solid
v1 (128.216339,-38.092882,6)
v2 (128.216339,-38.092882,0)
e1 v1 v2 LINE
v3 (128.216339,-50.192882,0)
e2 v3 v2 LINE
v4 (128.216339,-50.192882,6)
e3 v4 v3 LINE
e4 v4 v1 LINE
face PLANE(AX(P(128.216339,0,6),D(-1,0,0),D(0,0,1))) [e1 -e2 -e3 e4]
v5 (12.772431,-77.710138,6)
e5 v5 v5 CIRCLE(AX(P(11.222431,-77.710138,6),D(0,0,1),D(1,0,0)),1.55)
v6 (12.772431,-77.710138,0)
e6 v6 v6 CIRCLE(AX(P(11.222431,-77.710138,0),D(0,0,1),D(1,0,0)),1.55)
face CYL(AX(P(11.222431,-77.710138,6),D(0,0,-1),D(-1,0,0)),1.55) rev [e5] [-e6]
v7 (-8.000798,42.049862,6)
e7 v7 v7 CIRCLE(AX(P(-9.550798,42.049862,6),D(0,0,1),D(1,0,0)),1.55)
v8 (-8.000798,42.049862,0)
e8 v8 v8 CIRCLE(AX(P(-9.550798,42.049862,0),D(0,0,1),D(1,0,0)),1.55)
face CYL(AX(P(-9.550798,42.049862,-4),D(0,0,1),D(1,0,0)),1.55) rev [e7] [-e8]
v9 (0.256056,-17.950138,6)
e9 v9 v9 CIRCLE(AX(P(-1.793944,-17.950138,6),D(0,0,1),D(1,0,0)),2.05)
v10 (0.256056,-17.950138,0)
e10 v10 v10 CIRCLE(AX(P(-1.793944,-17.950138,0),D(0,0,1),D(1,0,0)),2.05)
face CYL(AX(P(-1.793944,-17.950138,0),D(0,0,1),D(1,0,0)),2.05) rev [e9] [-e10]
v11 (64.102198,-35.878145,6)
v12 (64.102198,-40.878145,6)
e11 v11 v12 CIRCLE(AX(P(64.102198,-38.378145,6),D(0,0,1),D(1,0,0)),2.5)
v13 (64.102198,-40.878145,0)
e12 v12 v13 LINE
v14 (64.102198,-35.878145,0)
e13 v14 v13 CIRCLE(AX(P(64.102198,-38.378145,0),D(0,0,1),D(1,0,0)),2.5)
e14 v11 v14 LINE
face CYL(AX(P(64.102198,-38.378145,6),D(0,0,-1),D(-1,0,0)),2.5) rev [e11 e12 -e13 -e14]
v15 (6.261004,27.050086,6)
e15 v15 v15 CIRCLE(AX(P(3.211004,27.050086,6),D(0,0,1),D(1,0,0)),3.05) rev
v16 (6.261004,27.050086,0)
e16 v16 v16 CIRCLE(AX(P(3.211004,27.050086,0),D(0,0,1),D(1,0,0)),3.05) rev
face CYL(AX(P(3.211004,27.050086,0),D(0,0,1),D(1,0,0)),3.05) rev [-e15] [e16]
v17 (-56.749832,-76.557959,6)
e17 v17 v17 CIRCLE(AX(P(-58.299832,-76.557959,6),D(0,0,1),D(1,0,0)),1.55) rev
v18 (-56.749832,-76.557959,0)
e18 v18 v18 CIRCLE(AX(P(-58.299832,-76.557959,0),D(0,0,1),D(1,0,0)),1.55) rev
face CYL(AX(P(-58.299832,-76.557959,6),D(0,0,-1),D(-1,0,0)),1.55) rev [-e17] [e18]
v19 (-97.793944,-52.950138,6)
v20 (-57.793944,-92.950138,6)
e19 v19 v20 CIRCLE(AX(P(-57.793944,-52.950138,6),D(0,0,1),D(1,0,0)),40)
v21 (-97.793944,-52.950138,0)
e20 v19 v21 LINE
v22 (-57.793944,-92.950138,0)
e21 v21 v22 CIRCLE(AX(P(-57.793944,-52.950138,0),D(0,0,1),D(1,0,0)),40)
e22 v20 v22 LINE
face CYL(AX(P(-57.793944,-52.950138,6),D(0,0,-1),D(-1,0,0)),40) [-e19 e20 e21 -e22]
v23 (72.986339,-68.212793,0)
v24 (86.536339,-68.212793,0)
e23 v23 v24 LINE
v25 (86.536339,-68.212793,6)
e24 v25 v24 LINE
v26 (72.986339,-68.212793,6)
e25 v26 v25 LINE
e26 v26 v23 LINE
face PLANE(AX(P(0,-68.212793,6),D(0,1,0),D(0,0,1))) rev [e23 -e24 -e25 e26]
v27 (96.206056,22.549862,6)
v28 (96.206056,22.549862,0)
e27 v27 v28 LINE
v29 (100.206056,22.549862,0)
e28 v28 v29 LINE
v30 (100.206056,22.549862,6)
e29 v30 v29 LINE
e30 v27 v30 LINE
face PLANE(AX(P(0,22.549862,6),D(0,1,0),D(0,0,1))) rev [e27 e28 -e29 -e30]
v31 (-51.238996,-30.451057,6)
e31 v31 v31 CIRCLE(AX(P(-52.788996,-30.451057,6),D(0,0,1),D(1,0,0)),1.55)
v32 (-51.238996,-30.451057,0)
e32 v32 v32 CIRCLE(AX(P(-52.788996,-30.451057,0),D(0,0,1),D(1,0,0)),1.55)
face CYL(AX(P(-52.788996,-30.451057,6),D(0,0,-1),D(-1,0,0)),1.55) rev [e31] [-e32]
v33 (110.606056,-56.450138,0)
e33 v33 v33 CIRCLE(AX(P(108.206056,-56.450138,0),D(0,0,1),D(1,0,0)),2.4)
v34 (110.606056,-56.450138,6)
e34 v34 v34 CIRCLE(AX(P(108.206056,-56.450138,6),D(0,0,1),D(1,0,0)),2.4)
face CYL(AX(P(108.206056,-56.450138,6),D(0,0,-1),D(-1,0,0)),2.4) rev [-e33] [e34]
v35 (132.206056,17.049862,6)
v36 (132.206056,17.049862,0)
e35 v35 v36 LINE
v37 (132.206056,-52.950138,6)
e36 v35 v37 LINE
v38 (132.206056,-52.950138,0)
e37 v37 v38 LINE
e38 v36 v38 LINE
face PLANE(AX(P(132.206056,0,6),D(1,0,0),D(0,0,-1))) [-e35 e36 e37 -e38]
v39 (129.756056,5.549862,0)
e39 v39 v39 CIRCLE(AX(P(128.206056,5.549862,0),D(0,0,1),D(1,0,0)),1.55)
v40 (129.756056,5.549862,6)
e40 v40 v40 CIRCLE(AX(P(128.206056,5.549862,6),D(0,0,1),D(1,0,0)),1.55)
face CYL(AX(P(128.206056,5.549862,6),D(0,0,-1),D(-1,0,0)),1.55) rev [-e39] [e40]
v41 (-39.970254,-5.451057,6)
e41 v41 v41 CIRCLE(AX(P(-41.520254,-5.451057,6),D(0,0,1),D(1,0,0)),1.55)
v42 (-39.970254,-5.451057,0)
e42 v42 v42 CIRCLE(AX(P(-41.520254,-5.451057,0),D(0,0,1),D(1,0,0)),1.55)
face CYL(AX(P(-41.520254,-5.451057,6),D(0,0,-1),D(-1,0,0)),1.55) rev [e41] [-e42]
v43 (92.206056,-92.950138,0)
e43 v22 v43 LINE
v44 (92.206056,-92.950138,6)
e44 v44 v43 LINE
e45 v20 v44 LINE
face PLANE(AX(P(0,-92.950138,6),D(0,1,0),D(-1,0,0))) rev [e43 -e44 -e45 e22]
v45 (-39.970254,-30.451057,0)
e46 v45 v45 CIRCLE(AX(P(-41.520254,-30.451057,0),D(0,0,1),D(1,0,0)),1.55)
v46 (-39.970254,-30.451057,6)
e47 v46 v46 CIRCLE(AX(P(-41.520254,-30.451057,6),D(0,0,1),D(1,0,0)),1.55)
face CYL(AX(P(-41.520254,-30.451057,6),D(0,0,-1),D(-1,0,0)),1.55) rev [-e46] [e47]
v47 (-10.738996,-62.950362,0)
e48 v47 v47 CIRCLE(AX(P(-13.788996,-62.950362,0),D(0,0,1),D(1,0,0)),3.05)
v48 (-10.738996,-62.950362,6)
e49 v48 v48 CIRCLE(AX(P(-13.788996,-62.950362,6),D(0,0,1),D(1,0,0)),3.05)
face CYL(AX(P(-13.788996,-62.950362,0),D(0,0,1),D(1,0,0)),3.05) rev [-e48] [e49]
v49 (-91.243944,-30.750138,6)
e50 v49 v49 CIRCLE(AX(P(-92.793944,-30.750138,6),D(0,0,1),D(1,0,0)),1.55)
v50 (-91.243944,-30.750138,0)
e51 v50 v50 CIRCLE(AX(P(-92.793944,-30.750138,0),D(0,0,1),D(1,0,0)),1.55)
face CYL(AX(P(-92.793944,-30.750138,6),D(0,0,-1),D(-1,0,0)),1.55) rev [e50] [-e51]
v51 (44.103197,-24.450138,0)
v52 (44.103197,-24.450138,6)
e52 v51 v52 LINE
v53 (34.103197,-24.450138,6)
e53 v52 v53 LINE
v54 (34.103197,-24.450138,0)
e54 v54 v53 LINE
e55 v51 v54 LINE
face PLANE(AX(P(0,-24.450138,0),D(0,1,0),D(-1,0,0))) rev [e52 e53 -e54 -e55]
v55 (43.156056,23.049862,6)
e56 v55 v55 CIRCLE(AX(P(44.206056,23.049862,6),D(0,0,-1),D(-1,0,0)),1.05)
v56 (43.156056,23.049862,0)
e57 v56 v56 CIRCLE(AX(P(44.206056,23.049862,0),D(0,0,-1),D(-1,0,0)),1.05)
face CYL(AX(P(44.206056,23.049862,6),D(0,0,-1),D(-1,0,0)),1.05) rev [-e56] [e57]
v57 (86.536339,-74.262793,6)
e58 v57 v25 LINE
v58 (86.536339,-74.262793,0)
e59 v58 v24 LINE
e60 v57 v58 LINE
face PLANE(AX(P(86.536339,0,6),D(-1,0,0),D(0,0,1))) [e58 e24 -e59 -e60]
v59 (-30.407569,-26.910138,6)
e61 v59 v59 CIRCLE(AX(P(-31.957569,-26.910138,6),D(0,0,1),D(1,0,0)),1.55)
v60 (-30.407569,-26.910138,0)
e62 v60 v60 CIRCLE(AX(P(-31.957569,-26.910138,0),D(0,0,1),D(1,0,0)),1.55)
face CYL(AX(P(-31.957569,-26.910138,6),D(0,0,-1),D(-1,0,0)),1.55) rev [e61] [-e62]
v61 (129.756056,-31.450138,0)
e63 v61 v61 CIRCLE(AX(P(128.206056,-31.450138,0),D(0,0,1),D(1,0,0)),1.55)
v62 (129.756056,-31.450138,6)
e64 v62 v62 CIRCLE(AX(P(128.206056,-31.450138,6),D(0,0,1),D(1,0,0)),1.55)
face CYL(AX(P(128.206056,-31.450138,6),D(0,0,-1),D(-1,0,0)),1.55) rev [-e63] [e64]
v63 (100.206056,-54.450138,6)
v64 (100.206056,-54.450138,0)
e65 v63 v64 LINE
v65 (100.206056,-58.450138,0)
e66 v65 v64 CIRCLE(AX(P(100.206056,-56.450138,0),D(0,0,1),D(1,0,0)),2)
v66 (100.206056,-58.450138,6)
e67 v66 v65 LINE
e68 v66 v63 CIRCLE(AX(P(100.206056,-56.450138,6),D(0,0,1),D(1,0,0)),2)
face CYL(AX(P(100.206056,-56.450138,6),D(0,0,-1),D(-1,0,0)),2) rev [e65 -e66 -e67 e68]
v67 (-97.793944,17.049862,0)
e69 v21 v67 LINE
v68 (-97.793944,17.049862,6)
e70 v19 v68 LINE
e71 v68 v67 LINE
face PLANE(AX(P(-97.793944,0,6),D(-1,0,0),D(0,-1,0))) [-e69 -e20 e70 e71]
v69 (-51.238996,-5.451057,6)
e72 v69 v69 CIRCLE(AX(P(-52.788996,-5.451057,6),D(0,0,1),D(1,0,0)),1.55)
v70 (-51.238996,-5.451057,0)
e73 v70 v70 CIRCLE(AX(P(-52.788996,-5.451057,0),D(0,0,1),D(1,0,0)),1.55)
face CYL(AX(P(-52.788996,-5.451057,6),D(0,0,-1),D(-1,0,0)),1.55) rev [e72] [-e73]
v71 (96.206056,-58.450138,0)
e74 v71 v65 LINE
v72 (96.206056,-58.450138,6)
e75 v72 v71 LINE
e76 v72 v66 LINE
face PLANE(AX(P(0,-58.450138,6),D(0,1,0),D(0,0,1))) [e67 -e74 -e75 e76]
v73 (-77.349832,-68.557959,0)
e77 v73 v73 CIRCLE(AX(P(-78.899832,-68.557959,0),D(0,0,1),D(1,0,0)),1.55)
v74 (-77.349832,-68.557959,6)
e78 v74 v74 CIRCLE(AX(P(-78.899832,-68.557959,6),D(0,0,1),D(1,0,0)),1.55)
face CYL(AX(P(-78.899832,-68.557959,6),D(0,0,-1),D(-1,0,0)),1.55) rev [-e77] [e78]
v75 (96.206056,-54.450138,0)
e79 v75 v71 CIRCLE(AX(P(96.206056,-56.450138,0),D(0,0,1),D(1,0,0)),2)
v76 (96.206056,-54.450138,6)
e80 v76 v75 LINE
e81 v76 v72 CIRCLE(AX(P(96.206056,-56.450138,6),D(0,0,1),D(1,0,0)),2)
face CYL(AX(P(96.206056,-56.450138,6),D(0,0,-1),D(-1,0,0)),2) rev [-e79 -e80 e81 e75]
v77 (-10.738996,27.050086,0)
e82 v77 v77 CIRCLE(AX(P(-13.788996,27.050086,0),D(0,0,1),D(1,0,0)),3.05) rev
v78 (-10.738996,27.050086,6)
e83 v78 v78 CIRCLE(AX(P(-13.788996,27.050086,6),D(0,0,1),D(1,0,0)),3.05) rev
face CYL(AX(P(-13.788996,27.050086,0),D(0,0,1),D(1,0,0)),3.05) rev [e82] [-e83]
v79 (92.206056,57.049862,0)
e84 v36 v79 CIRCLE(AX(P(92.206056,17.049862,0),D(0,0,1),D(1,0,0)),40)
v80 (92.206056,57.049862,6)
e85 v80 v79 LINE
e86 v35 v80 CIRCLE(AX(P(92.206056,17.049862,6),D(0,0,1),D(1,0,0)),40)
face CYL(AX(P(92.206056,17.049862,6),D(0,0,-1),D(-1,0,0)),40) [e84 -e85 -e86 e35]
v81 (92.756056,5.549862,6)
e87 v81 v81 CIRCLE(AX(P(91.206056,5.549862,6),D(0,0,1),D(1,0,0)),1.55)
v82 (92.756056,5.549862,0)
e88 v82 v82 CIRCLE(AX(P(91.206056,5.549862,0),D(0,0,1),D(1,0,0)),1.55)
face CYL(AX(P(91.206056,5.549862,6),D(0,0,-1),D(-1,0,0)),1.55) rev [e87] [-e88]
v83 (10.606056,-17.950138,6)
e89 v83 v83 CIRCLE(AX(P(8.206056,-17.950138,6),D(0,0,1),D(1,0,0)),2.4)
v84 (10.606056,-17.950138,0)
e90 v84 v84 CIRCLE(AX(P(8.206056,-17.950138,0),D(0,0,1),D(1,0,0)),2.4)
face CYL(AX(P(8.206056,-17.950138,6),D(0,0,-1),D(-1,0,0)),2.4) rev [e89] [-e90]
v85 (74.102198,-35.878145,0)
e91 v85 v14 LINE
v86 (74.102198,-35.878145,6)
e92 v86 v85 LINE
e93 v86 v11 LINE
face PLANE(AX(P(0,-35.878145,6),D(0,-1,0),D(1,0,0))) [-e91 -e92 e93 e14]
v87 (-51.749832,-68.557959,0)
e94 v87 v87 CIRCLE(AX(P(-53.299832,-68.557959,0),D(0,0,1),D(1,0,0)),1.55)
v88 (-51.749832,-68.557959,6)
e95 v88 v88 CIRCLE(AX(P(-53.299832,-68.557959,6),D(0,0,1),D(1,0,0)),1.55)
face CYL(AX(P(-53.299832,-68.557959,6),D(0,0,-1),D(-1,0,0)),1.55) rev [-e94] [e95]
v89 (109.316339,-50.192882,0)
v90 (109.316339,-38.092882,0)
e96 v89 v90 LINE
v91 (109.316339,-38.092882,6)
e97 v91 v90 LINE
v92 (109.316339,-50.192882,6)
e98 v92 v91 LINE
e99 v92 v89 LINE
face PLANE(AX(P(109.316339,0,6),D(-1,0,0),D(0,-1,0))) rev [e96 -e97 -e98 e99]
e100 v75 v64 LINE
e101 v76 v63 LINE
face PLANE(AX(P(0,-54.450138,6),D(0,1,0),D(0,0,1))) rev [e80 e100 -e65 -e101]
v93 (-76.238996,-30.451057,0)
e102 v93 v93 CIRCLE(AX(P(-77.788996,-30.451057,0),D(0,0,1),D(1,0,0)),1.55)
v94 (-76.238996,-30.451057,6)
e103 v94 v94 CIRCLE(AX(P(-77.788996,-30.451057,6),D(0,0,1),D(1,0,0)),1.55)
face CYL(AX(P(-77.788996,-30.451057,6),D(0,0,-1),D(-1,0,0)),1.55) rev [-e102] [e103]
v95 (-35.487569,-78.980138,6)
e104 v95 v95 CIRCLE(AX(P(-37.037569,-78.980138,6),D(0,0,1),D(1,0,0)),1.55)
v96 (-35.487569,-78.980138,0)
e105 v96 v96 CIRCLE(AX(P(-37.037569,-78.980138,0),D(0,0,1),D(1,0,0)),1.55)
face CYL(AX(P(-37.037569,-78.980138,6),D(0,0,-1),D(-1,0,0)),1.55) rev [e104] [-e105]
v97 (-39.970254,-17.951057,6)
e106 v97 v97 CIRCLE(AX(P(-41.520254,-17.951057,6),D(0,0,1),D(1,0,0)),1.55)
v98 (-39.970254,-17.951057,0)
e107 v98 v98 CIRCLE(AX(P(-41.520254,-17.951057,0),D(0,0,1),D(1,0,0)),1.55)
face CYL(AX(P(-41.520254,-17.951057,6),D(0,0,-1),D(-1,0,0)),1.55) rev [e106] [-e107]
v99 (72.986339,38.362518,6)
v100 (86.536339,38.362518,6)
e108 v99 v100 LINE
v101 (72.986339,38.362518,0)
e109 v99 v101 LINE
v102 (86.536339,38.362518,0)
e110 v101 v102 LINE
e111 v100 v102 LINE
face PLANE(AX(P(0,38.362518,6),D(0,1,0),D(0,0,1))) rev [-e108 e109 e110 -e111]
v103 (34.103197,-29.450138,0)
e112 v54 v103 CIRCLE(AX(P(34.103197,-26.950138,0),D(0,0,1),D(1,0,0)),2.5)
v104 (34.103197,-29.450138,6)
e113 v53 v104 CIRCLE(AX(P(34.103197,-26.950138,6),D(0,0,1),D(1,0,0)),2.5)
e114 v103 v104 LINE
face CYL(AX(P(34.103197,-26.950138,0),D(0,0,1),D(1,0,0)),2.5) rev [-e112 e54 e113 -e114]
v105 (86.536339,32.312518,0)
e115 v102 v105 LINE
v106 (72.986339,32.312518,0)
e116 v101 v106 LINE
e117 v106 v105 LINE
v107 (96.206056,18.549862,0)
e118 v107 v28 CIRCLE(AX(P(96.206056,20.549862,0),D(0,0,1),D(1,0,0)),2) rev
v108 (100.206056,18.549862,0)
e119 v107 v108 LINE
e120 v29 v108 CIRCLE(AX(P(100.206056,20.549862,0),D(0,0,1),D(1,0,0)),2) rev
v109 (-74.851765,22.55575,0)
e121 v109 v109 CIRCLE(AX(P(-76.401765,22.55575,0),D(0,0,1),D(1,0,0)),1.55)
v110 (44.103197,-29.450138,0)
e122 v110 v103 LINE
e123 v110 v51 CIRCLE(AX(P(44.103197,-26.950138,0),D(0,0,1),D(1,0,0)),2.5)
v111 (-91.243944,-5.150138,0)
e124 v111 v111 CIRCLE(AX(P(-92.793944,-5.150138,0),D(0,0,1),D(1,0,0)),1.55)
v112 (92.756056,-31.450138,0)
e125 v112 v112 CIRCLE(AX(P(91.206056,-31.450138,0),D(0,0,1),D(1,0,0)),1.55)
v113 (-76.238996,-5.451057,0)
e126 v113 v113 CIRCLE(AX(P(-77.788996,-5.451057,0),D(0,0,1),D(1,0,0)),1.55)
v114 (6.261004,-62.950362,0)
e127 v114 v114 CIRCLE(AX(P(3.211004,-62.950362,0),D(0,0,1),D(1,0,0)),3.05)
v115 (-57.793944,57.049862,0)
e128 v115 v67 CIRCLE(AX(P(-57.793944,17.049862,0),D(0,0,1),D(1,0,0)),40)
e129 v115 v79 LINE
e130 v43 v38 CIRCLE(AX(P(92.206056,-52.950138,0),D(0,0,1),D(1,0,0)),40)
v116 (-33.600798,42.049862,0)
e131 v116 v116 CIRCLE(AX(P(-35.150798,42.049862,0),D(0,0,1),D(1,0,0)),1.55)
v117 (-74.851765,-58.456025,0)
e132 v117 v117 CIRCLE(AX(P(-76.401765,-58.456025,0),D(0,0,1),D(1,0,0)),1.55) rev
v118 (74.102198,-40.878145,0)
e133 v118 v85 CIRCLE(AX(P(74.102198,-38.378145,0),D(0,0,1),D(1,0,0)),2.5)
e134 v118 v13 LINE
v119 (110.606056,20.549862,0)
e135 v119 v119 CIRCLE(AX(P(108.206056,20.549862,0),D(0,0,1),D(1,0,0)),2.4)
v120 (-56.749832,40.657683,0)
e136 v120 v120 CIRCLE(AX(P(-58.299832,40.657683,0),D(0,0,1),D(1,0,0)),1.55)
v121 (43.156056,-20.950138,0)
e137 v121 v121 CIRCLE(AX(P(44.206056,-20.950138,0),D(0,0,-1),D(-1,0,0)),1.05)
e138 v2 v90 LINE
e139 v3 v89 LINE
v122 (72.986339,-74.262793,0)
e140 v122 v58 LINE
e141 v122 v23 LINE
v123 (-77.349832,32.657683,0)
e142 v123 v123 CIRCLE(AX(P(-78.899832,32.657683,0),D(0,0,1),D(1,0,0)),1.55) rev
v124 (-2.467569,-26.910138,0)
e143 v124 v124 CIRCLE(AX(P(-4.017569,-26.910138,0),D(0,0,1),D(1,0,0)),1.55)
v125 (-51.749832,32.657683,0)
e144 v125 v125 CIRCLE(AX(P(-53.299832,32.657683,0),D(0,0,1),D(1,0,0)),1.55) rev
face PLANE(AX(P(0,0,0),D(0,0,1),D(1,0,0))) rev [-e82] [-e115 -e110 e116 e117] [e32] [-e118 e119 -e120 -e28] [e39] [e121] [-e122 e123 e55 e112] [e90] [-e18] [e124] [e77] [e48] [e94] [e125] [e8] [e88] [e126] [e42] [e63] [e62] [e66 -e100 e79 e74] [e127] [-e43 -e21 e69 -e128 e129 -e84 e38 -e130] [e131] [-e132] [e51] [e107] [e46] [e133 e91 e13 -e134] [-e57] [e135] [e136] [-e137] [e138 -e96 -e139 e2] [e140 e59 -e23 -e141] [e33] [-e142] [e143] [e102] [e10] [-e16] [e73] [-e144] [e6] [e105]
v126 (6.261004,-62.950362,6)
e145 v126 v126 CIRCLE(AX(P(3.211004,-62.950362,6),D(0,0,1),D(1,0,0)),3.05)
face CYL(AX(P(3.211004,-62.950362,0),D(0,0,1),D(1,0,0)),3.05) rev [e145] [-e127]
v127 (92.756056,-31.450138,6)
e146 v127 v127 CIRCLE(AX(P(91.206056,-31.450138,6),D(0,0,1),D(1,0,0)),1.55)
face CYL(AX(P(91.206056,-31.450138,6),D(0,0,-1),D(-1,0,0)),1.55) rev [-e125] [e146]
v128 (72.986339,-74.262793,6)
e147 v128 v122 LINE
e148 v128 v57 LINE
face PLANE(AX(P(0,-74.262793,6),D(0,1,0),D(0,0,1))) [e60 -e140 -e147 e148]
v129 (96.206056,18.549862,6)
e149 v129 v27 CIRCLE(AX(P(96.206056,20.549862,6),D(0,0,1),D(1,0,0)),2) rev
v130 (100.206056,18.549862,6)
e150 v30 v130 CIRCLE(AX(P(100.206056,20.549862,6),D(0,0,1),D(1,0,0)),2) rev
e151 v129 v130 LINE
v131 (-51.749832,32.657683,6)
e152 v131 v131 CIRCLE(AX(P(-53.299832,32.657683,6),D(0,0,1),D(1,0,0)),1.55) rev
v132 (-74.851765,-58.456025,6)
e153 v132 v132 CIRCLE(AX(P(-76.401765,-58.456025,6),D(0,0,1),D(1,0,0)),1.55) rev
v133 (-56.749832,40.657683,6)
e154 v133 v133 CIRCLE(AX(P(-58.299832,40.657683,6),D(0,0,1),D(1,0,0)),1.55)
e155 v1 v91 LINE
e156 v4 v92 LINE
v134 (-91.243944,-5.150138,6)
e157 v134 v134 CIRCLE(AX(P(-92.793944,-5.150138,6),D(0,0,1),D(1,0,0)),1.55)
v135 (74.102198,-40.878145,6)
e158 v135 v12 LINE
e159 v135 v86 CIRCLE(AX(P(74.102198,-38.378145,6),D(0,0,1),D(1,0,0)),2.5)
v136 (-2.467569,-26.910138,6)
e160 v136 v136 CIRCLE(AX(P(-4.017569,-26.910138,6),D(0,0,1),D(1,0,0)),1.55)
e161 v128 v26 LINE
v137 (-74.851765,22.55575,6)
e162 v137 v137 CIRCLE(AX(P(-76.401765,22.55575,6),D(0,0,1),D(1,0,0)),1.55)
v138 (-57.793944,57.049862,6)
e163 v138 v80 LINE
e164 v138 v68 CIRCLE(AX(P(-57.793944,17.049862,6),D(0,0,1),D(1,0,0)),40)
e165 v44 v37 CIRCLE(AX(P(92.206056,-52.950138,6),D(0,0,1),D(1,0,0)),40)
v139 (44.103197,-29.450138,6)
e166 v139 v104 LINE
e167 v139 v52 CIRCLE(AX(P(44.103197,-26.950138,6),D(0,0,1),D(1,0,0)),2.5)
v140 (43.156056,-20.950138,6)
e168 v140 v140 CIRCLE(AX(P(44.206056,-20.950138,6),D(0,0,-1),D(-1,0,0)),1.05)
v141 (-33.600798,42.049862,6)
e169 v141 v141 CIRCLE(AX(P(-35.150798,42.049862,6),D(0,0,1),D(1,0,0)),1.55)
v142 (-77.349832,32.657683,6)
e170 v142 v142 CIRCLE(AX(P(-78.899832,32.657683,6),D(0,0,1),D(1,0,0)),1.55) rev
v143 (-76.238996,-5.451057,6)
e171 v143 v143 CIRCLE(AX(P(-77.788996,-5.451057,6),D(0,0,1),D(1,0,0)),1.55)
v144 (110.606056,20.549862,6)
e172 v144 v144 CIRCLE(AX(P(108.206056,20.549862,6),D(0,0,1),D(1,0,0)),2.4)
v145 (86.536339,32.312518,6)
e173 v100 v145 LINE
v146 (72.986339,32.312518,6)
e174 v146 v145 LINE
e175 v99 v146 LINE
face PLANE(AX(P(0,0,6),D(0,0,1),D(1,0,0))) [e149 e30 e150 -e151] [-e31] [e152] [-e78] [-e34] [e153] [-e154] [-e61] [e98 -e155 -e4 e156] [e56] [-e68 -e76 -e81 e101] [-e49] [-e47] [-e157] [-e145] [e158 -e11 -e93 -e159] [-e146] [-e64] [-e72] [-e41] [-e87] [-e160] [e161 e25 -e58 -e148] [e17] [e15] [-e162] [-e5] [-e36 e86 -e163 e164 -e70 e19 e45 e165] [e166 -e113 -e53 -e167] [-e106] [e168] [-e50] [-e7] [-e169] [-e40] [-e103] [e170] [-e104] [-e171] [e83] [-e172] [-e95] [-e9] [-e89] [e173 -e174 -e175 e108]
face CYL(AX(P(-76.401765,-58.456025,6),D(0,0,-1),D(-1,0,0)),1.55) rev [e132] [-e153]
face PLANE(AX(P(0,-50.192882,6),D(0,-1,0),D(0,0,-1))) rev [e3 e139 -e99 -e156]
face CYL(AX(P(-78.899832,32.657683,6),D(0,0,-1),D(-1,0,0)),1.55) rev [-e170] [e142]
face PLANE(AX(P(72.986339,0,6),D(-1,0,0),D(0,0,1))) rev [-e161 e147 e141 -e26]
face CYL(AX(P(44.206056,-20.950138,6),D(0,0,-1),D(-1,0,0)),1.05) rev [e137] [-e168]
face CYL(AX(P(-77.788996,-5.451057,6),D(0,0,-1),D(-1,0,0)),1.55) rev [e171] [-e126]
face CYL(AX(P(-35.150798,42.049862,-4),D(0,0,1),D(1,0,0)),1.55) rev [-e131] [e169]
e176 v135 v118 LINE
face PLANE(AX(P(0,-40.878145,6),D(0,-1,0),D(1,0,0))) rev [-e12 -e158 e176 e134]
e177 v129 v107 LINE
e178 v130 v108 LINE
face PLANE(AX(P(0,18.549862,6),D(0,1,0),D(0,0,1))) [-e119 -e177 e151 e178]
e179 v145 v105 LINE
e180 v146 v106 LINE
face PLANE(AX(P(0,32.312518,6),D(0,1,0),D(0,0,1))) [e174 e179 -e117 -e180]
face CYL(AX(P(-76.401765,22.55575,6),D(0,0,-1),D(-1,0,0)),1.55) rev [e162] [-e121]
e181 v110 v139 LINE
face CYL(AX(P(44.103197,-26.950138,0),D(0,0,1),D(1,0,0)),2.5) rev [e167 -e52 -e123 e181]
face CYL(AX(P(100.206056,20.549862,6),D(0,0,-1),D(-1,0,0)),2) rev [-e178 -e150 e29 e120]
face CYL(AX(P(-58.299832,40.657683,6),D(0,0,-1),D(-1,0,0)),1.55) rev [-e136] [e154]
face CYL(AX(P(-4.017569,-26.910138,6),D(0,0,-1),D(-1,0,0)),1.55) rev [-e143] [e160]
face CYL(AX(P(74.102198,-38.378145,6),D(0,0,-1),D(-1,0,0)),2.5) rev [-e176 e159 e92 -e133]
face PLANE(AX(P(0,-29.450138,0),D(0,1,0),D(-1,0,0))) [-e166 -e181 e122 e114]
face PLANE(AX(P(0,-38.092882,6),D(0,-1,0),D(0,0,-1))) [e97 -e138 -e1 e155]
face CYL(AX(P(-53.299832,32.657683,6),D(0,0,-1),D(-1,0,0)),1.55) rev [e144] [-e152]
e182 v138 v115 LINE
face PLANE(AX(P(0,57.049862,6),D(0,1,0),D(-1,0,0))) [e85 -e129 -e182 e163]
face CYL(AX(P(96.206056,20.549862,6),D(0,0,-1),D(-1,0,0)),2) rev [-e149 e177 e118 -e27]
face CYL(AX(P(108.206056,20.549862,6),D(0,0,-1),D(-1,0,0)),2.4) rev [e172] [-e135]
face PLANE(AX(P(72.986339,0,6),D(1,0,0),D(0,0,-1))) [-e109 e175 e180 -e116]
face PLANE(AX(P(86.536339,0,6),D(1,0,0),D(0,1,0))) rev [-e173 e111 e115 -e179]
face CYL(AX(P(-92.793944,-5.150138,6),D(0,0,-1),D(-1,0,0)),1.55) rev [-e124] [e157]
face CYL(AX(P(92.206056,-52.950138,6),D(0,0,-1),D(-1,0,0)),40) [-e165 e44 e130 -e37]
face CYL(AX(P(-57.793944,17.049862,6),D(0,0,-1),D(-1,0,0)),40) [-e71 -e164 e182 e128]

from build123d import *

# Parameters (mm, degrees)
ESBO_O1_R                   = 1.55
ESBO_O1_R_2                 = 2.4
ESBO_O1_R_3                 = 1.05
ESBO_O1_W                   = 18.9
ESBO_O1_H                   = 12.1
ESBO_O1_W_2                 = 13.55
ESBO_O1_H_2                 = 6.05
RESSALTO_EXTRUS_O1_DEPTH    = 6
CORTE_EXTRUS_O1_START       = -6
CORTE_EXTRUS_O1_OUTLINE_R   = 2.999999997
CORTE_EXTRUS_O1_OUTLINE_R_2 = 2.55
CORTE_EXTRUS_O1_OUTLINE_R_3 = 1.55
CORTE_EXTRUS_O1_DEPTH       = 6
RESSALTO_EXTRUS_O2_DEPTH    = 6
CORTE_EXTRUS_O2_DEPTH       = 6
ESBO_O5_R                   = 2.05
CORTE_EXTRUS_O3_DEPTH       = 6
RESSALTO_EXTRUS_O3_DEPTH    = 6
ESBO_O8_W                   = 50
ESBO_O8_H                   = 9.999552213
ESBO_O8_H_2                 = 10.000447787
RESSALTO_EXTRUS_O4_DEPTH    = 6
ESBO_O9_R                   = 3.05
CORTE_EXTRUS_O4_DEPTH       = 6
ESBO_O10_R                  = 1.05
RESSALTO_EXTRUS_O5_DEPTH    = 6
ESBO_O11_R                  = 1.05
CORTE_EXTRUS_O5_DEPTH       = 6


# Read off the part's stored shape, not the designer's step: Corte-extrusão1
with BuildPart() as part:
    # Esboço1 → Ressalto-extrusão1 (new body)
    with BuildSketch(Plane.XY):
        with BuildLine():
            Line((-57.793944221, 57.049862318), (92.206055779, 57.049862318))
            ThreePointArc((92.206055779, 57.049862318), (120.490327027, 45.334133565), (132.206055779, 17.049862318))
            Line((132.206055779, 17.049862318), (132.206055779, -52.950137682))
            ThreePointArc((132.206055779, -52.950137682), (120.490327027, -81.234408929), (92.206055779, -92.950137682))
            Line((92.206055779, -92.950137682), (-57.793944221, -92.950137682))
            ThreePointArc((-57.793944221, -92.950137682), (-86.078215468, -81.234408929), (-97.793944221, -52.950137682))
            Line((-97.793944221, -52.950137682), (-97.793944221, 17.049862318))
            ThreePointArc((-97.793944221, 17.049862318), (-86.078215468, 45.334133565), (-57.793944221, 57.049862318))
        make_face()
        with Locations((91.206055779, 5.549862318)):
            Circle(ESBO_O1_R, mode=Mode.SUBTRACT)
        with Locations((-78.899831671, -68.557958731)):
            Circle(ESBO_O1_R, mode=Mode.SUBTRACT)
        with Locations((91.206055779, -31.450137682)):
            Circle(ESBO_O1_R, mode=Mode.SUBTRACT)
        with Locations((-53.299831671, -68.557958731)):
            Circle(ESBO_O1_R, mode=Mode.SUBTRACT)
        with Locations((128.206055779, -31.450137682)):
            Circle(ESBO_O1_R, mode=Mode.SUBTRACT)
        with Locations((-77.788996209, -5.451057304)):
            Circle(ESBO_O1_R, mode=Mode.SUBTRACT)
        with Locations((11.222430841, -77.710137682)):
            Circle(ESBO_O1_R, mode=Mode.SUBTRACT)
        with Locations((-37.037569159, -78.980137682)):
            Circle(ESBO_O1_R, mode=Mode.SUBTRACT)
        with Locations((-31.957569159, -26.910137682)):
            Circle(ESBO_O1_R, mode=Mode.SUBTRACT)
        with Locations((-4.017569159, -26.910137682)):
            Circle(ESBO_O1_R, mode=Mode.SUBTRACT)
        with Locations((128.206055779, 5.549862318)):
            Circle(ESBO_O1_R, mode=Mode.SUBTRACT)
        with Locations((-92.793944221, -30.750137682)):
            Circle(ESBO_O1_R, mode=Mode.SUBTRACT)
        with Locations((-92.793944221, -5.150137682)):
            Circle(ESBO_O1_R, mode=Mode.SUBTRACT)
        with Locations((-76.401765269, 22.555749768)):
            Circle(ESBO_O1_R, mode=Mode.SUBTRACT)
        with Locations((-52.788996209, -5.451057304)):
            Circle(ESBO_O1_R, mode=Mode.SUBTRACT)
        with Locations((-52.788996209, -30.451057304)):
            Circle(ESBO_O1_R, mode=Mode.SUBTRACT)
        with Locations((-77.788996209, -30.451057304)):
            Circle(ESBO_O1_R, mode=Mode.SUBTRACT)
        with Locations((-78.899831671, 32.657683367)):
            Circle(ESBO_O1_R, mode=Mode.SUBTRACT)
        with Locations((-53.299831671, 32.657683367)):
            Circle(ESBO_O1_R, mode=Mode.SUBTRACT)
        with Locations((-58.299831671, 40.657683367)):
            Circle(ESBO_O1_R, mode=Mode.SUBTRACT)
        with Locations((-58.299831671, -76.557958731)):
            Circle(ESBO_O1_R, mode=Mode.SUBTRACT)
        with Locations((-76.401765269, -58.456025132)):
            Circle(ESBO_O1_R, mode=Mode.SUBTRACT)
        with Locations((-35.15079847, 31.606716567)):
            Circle(ESBO_O1_R, mode=Mode.SUBTRACT)
        with Locations((-9.55079847, 31.606716567)):
            Circle(ESBO_O1_R, mode=Mode.SUBTRACT)
        with Locations((108.206055779, -56.450137682)):
            Circle(ESBO_O1_R_2, mode=Mode.SUBTRACT)
        with Locations((108.206055779, 20.549862318)):
            Circle(ESBO_O1_R_2, mode=Mode.SUBTRACT)
        with Locations((44.206055779, -19.950137682)):
            Circle(ESBO_O1_R_3, mode=Mode.SUBTRACT)
        with Locations((8.206055779, -17.950137682)):
            Circle(ESBO_O1_R_2, mode=Mode.SUBTRACT)
        with Locations((44.206055779, 24.049862318)):
            Circle(ESBO_O1_R_3, mode=Mode.SUBTRACT)
        with Locations((-41.520254265, -30.451057304)):
            Circle(ESBO_O1_R, mode=Mode.SUBTRACT)
        with Locations((-41.520254265, -17.951057304)):
            Circle(ESBO_O1_R, mode=Mode.SUBTRACT)
        with Locations((-41.520254265, -5.451057304)):
            Circle(ESBO_O1_R, mode=Mode.SUBTRACT)
        with BuildLine():
            Line((74.102198496, -40.878145103), (64.102198496, -40.878145103))
            ThreePointArc((64.102198496, -40.878145103), (61.602198496, -38.378145103), (64.102198496, -35.878145103))
            Line((64.102198496, -35.878145103), (74.102198496, -35.878145103))
            ThreePointArc((74.102198496, -35.878145103), (76.602198496, -38.378145103), (74.102198496, -40.878145103))
        make_face(mode=Mode.SUBTRACT)
        with BuildLine():
            Line((96.206055779, 22.549862318), (100.206055779, 22.549862318))
            ThreePointArc((100.206055779, 22.549862318), (102.206055779, 20.549862318), (100.206055779, 18.549862318))
            Line((100.206055779, 18.549862318), (96.206055779, 18.549862318))
            ThreePointArc((96.206055779, 18.549862318), (94.206055779, 20.549862318), (96.206055779, 22.549862318))
        make_face(mode=Mode.SUBTRACT)
        with BuildLine():
            Line((96.206055779, -54.450137682), (100.206055779, -54.450137682))
            ThreePointArc((100.206055779, -54.450137682), (102.206055779, -56.450137682), (100.206055779, -58.450137682))
            Line((100.206055779, -58.450137682), (96.206055779, -58.450137682))
            ThreePointArc((96.206055779, -58.450137682), (94.206055779, -56.450137682), (96.206055779, -54.450137682))
        make_face(mode=Mode.SUBTRACT)
        with Locations((118.766338719, -44.142882399)):
            Rectangle(ESBO_O1_W, ESBO_O1_H, mode=Mode.SUBTRACT)
        with Locations((79.761339118, 35.337517738)):
            Rectangle(ESBO_O1_W_2, ESBO_O1_H_2, mode=Mode.SUBTRACT)
        with Locations((79.761339118, -71.237793102)):
            Rectangle(ESBO_O1_W_2, ESBO_O1_H_2, mode=Mode.SUBTRACT)
    extrude(amount=RESSALTO_EXTRUS_O1_DEPTH)

    # Corte-extrusão1 outline → Corte-extrusão1 (cut)
    with BuildSketch(Plane.XY.offset(6).offset(CORTE_EXTRUS_O1_START)):
        with Locations((-17.788996212, -62.950585469)):
            Circle(CORTE_EXTRUS_O1_OUTLINE_R)
        with Locations((7.211003788, -62.950585469)):
            Circle(CORTE_EXTRUS_O1_OUTLINE_R)
        with Locations((-17.788996212, 27.049414531)):
            Circle(CORTE_EXTRUS_O1_OUTLINE_R)
        with Locations((7.211003788, 27.049414531)):
            Circle(CORTE_EXTRUS_O1_OUTLINE_R)
        with Locations((0.411003785, -17.950228357)):
            Circle(CORTE_EXTRUS_O1_OUTLINE_R_2)
        with Locations((-35.15079847, 42.049862318)):
            Circle(CORTE_EXTRUS_O1_OUTLINE_R_3)
        with Locations((-9.55079847, 42.049862318)):
            Circle(CORTE_EXTRUS_O1_OUTLINE_R_3)
    extrude(amount=CORTE_EXTRUS_O1_DEPTH, mode=Mode.SUBTRACT)

    # Esboço3 → Ressalto-extrusão2 (add)
    with BuildSketch(Plane.XY.offset(6)):
        Polygon((-14.016641423, 28.740365826), (0, 28.740365826), (0, 35.849208008), (-40.162042527, 35.849208008), (-40.162042527, 28.740365826), (-25.883056006, 28.740365826), (-25.883056006, 31.312651868), (-14.016641423, 31.312651868), align=None)
    extrude(amount=-RESSALTO_EXTRUS_O2_DEPTH)

    # Esboço4 → Corte-extrusão2 (cut)
    with BuildSketch(Plane.XY.offset(6)):
        with BuildLine():
            Line((44.103196828, -24.450137682), (34.103196828, -24.450137682))
            ThreePointArc((34.103196828, -24.450137682), (31.603196828, -26.950137682), (34.103196828, -29.450137682))
            Line((34.103196828, -29.450137682), (44.103196828, -29.450137682))
            ThreePointArc((44.103196828, -29.450137682), (46.603196828, -26.950137682), (44.103196828, -24.450137682))
        make_face()
    extrude(amount=-CORTE_EXTRUS_O2_DEPTH, mode=Mode.SUBTRACT)

    # Esboço5 → Corte-extrusão3 (cut)
    with BuildSketch(Plane.XY.offset(6)):
        with Locations((-1.793944221, -17.950137682)):
            Circle(ESBO_O5_R)
    extrude(amount=-CORTE_EXTRUS_O3_DEPTH, mode=Mode.SUBTRACT)

    # Esboço6 → Ressalto-extrusão3 (add)
    with BuildSketch(Plane.XY.offset(6)):
        with BuildLine():
            ThreePointArc((0.256055779, -17.950137682), (-0.344375319, -19.399706583), (-1.793944221, -20.000137682))
            Line((-1.793944221, -20.000137682), (-1.793944221, -22.624881404))
            Line((-1.793944221, -22.624881404), (3.749048886, -22.624881404))
            Line((3.749048886, -22.624881404), (3.749048886, -13.412148233))
            Line((3.749048886, -13.412148233), (-1.793944221, -13.412148233))
            Line((-1.793944221, -13.412148233), (-1.793944221, -15.900137682))
            ThreePointArc((-1.793944221, -15.900137682), (-0.344375319, -16.500568781), (0.256055779, -17.950137682))
        make_face()
    extrude(amount=-RESSALTO_EXTRUS_O3_DEPTH)

    # Esboço8 → Ressalto-extrusão4 (add)
    with BuildSketch(Plane.XY.offset(6)):
        with Locations((-5.288996218, -62.950361576)):
            Rectangle(ESBO_O8_W, ESBO_O8_H)
        with Locations((-5.288996218, 27.049638425)):
            Rectangle(ESBO_O8_W, ESBO_O8_H_2)
    extrude(amount=-RESSALTO_EXTRUS_O4_DEPTH)

    # Esboço9 → Corte-extrusão4 (cut)
    with BuildSketch(Plane.XY.offset(6)):
        with Locations((-13.788996218, -62.950361575)):
            Circle(ESBO_O9_R)
        with Locations((3.211003782, -62.950361575)):
            Circle(ESBO_O9_R)
        with Locations((3.211003782, 27.050086211)):
            Circle(ESBO_O9_R)
        with Locations((-13.788996218, 27.050086211)):
            Circle(ESBO_O9_R)
    extrude(amount=-CORTE_EXTRUS_O4_DEPTH, mode=Mode.SUBTRACT)

    # Esboço10 → Ressalto-extrusão5 (add)
    with BuildSketch(Plane(origin=(0, 0, 0), x_dir=(-1, 0, 0), z_dir=(0, 0, -1))):
        with Locations((-44.206055779, -19.950137682)):
            Circle(ESBO_O10_R)
        with Locations((-44.206055779, 24.049862318)):
            Circle(ESBO_O10_R)
    extrude(amount=-RESSALTO_EXTRUS_O5_DEPTH)

    # Esboço11 → Corte-extrusão5 (cut)
    with BuildSketch(Plane(origin=(0, 0, 0), x_dir=(-1, 0, 0), z_dir=(0, 0, -1))):
        with Locations((-44.206055779, 23.049862318)):
            Circle(ESBO_O11_R)
        with Locations((-44.206055779, -20.950137682)):
            Circle(ESBO_O11_R)
    extrude(amount=-CORTE_EXTRUS_O5_DEPTH, mode=Mode.SUBTRACT)


solid = part.part
